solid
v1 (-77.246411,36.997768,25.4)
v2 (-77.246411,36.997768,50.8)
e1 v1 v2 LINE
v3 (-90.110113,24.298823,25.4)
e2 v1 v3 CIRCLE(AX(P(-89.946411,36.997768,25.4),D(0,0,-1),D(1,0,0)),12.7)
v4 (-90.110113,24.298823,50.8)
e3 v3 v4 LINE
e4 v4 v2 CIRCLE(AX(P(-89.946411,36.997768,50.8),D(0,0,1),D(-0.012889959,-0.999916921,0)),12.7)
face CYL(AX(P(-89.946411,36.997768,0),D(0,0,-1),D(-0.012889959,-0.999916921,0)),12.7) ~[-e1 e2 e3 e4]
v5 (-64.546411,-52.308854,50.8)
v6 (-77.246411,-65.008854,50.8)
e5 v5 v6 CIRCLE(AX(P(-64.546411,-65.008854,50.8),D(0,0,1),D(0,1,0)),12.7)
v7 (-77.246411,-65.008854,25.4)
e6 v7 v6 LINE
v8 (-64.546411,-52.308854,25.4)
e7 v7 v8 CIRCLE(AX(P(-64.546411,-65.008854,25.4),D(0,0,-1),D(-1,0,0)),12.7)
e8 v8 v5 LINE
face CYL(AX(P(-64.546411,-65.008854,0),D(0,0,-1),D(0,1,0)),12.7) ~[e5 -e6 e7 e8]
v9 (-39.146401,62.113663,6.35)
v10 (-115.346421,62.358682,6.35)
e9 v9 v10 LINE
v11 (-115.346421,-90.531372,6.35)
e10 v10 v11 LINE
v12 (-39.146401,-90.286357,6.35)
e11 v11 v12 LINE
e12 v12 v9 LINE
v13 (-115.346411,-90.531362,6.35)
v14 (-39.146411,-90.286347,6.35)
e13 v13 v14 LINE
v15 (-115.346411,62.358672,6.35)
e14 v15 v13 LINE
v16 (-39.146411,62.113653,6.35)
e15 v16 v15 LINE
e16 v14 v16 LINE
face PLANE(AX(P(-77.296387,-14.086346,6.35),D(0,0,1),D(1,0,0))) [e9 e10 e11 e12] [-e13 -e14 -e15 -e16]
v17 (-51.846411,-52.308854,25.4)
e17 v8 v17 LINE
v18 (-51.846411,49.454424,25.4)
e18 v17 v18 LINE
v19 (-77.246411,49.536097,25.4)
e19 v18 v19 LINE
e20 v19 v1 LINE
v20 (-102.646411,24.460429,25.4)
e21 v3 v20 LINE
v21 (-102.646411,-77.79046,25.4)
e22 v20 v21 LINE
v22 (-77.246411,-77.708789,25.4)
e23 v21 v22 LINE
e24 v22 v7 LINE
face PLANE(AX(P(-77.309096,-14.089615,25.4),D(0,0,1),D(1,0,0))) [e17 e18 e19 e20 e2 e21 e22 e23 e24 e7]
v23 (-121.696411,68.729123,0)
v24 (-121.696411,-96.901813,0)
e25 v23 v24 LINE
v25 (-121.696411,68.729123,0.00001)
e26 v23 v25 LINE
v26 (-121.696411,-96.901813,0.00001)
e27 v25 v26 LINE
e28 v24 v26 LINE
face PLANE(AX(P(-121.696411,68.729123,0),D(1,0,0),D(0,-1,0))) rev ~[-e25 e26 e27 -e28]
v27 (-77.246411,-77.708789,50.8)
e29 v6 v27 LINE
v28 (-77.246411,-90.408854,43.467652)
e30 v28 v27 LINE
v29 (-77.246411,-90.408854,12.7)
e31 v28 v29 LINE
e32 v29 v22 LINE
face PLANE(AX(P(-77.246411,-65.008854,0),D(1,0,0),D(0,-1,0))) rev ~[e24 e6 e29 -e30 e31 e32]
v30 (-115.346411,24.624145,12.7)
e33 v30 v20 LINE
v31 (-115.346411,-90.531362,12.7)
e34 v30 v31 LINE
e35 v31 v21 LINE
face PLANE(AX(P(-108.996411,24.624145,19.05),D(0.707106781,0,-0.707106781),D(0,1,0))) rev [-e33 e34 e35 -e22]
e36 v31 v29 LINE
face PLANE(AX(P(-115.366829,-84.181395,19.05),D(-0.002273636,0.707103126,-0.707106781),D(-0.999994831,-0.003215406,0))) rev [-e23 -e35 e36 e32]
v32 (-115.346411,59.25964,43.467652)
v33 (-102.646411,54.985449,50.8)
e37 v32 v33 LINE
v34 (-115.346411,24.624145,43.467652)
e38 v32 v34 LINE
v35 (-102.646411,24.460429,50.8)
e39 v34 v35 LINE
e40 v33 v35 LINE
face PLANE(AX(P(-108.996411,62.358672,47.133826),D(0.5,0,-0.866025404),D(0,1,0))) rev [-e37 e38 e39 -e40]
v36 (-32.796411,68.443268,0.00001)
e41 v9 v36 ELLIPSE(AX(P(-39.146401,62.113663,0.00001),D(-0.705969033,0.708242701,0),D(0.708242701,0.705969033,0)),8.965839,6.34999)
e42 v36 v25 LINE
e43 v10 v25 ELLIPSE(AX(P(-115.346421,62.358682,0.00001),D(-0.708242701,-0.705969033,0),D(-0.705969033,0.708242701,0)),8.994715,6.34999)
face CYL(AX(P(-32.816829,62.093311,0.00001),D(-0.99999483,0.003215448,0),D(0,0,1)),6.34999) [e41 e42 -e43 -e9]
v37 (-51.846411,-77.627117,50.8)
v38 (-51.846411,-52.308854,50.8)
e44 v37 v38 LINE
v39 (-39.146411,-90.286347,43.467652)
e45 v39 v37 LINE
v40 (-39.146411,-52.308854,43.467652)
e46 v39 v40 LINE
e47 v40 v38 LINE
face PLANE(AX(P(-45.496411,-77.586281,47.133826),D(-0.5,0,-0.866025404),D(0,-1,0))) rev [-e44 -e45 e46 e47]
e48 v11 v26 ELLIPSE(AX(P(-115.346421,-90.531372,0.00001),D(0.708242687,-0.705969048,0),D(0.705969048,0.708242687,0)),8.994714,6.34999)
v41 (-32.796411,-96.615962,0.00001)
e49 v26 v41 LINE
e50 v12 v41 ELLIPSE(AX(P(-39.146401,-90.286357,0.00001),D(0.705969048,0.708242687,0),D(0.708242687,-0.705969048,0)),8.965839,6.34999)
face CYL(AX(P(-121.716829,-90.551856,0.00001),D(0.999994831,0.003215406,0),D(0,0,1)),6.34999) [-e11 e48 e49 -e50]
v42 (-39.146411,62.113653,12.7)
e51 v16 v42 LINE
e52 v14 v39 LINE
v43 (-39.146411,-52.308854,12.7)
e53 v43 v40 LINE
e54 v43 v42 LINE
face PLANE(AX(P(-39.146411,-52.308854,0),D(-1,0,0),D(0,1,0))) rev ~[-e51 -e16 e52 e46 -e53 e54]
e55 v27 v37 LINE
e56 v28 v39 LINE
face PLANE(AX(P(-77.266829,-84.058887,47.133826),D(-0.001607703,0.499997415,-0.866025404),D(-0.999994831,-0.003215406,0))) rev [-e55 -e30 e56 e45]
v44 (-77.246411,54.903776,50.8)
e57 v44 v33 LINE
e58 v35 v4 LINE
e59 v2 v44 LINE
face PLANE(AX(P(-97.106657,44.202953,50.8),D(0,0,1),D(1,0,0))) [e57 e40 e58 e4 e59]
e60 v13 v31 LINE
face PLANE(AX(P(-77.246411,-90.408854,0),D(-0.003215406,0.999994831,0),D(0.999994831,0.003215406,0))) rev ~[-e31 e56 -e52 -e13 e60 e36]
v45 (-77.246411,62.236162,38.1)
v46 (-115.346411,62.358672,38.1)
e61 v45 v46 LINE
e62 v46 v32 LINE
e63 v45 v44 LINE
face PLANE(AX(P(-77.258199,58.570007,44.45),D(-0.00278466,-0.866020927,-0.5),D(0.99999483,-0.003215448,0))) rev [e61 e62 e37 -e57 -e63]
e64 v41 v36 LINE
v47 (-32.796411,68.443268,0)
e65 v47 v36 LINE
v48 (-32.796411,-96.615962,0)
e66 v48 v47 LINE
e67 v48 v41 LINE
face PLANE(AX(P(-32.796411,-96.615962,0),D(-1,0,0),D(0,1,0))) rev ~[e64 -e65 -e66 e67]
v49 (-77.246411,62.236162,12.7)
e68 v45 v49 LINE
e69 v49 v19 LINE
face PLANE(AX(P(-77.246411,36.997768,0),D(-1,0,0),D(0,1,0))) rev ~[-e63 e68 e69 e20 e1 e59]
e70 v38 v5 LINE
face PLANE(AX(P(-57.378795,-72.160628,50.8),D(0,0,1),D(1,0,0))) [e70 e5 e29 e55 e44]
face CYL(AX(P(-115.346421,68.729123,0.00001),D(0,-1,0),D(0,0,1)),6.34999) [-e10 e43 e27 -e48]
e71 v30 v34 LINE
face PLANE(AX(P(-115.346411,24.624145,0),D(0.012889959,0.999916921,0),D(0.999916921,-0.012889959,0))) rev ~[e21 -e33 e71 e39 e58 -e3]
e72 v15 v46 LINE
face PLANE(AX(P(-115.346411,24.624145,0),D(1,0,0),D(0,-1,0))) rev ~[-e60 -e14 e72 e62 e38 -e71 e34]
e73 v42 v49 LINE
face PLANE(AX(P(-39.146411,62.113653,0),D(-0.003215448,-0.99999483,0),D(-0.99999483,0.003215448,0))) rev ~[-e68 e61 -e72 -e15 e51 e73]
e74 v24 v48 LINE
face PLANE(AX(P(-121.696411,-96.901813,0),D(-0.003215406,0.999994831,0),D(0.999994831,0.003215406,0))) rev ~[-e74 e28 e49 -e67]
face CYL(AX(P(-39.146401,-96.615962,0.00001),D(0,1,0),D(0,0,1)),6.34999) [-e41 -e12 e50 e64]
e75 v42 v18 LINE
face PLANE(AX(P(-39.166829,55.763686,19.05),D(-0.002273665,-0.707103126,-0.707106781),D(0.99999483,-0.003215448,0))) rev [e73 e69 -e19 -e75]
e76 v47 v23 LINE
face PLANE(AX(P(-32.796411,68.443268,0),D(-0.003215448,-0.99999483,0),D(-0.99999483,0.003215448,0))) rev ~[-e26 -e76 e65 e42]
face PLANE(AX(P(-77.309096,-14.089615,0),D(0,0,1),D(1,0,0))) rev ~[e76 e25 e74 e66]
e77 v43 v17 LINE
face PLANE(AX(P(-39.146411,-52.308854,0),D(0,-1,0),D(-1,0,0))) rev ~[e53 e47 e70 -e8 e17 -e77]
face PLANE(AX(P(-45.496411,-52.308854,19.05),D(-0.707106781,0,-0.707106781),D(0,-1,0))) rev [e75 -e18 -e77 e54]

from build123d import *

# Parameters (mm, degrees)
F1_DEPTH    = 6.35
F2_DEPTH    = 25.4
F3_DEPTH    = 50.8
F4_R        = 6.34999
F5_SIZE     = 12.7
F6_C1_SIZE2 = 12.7
F6_C1_SIZE  = 7.3323484187
F6_C2_SIZE2 = 12.7
F6_C2_SIZE  = 7.3323484187
F6_C3_SIZE2 = 7.3323484187
F6_C3_SIZE  = 12.7
F6_C4_SIZE2 = 12.7
F6_C4_SIZE  = 7.3323484187


# Not quite as in the source:
# - a fillet or chamfer is up to 0.001 mm smaller than in the source, because OpenCascade refuses the exact size


with BuildPart() as f1:
    # F0 (on Top) → F1 (new body)
    with BuildSketch(Plane.XY):
        Polygon((-32.7964108223, 68.4432678408), (-121.6964108223, 68.7291226315), (-121.6964108223, -96.9018127685), (-32.7964108223, -96.6159616778), align=None)
        Polygon((-115.3464108223, 24.6241450903), (-115.3464108223, 62.3586716052), (-77.2464108223, 62.2361624092), (-39.1464108223, 62.1136532132), (-39.1464108223, -52.3088543971), (-39.1464108223, -90.2863467868), (-77.2464108223, -90.4088543971), (-115.3464108223, -90.5313620074), align=None, mode=Mode.SUBTRACT)
    extrude(amount=F1_DEPTH)

    # F0 (on Top) → F2 (join)
    with BuildSketch(Plane.XY):
        with BuildLine():
            Line((-90.1101133053, 24.2988232152), (-115.3464108223, 24.6241450903))
            Line((-115.3464108223, 24.6241450903), (-115.3464108223, -90.5313620074))
            Line((-115.3464108223, -90.5313620074), (-77.2464108223, -90.4088543971))
            Line((-77.2464108223, -90.4088543971), (-77.2464108223, -65.0088543971))
            ThreePointArc((-77.2464108223, -65.0088543971), (-73.5266669434, -56.028598276), (-64.5464108223, -52.3088543971))
            Line((-64.5464108223, -52.3088543971), (-39.1464108223, -52.3088543971))
            Line((-39.1464108223, -52.3088543971), (-39.1464108223, 62.1136532132))
            Line((-39.1464108223, 62.1136532132), (-77.2464108223, 62.2361624092))
            Line((-77.2464108223, 62.2361624092), (-77.2464108223, 36.9977681122))
            ThreePointArc((-77.2464108223, 36.9977681122), (-81.0242199909, 27.9598197407), (-90.1101133053, 24.2988232152))
        make_face()
    extrude(amount=F2_DEPTH)

    # F0 (on Top) → F3 (join)
    with BuildSketch(Plane.XY):
        with BuildLine():
            Line((-77.2464108223, -65.0088543971), (-77.2464108223, -90.4088543971))
            Line((-77.2464108223, -90.4088543971), (-39.1464108223, -90.2863467868))
            Line((-39.1464108223, -90.2863467868), (-39.1464108223, -52.3088543971))
            Line((-39.1464108223, -52.3088543971), (-64.5464108223, -52.3088543971))
            ThreePointArc((-64.5464108223, -52.3088543971), (-73.5266669434, -56.028598276), (-77.2464108223, -65.0088543971))
        make_face()
        with BuildLine():
            Line((-77.2464108223, 62.2361624092), (-115.3464108223, 62.3586716052))
            Line((-115.3464108223, 62.3586716052), (-115.3464108223, 24.6241450903))
            Line((-115.3464108223, 24.6241450903), (-90.1101133053, 24.2988232152))
            ThreePointArc((-90.1101133053, 24.2988232152), (-81.0242199909, 27.9598197407), (-77.2464108223, 36.9977681122))
            Line((-77.2464108223, 36.9977681122), (-77.2464108223, 62.2361624092))
        make_face()
    extrude(amount=F3_DEPTH)

    # F4 (radius 6.35 in the source; OpenCascade refuses exactly that, so slightly less here)
    f4_edges = [f1.edges().sort_by_distance(p)[0] for p in [
        (-77.246411, -96.758887, 6.35),
        (-32.796411, -14.086347, 6.35),
        (-77.246411, 68.586195, 6.35),
        (-121.696411, -14.086345, 6.35),
    ]]
    fillet(f4_edges, radius=F4_R)

    # F5
    f5_edges = [f1.edges().sort_by_distance(p)[0] for p in [
        (-96.296411, -90.470108, 25.4),
        (-39.146411, 4.902399, 25.4),
        (-115.346411, -32.953608, 25.4),
        (-58.196411, 62.174908, 25.4),
    ]]
    chamfer(f5_edges, length=F5_SIZE)

    # F6: chamfer of 12.7 x 7.3323484187 on 4 edges, made by hand

    # F6_c1
    f6_c1_edges = [f1.edges().sort_by_distance(p)[0] for p in [
        (-115.3464108223, 43.4914083477, 50.8),
    ]]
    f6_c1_side = f1.faces().sort_by_distance((-115.3464108223, 43.4914083477, 50.6533530316))[0]
    chamfer(f6_c1_edges, length=F6_C1_SIZE, length2=F6_C1_SIZE2, reference=f6_c1_side)

    # F6_c2
    f6_c2_edges = [f1.edges().sort_by_distance(p)[0] for p in [
        (-58.1964108223, -90.3476005919, 50.8),
    ]]
    f6_c2_side = f1.faces().sort_by_distance((-58.1964108223, -90.3476005919, 50.6533530316))[0]
    chamfer(f6_c2_edges, length=F6_C2_SIZE, length2=F6_C2_SIZE2, reference=f6_c2_side)

    # F6_c3
    f6_c3_edges = [f1.edges().sort_by_distance(p)[0] for p in [
        (-89.9464108223, 62.2769988079, 50.8),
    ]]
    f6_c3_side = f1.faces().sort_by_distance((-89.9464108223, 62.2769988079, 50.6533530316))[0]
    chamfer(f6_c3_edges, length=F6_C3_SIZE, length2=F6_C3_SIZE2, reference=f6_c3_side)

    # F6_c4
    f6_c4_edges = [f1.edges().sort_by_distance(p)[0] for p in [
        (-39.1464108223, -64.9475677659, 50.8),
    ]]
    f6_c4_side = f1.faces().sort_by_distance((-39.1464108223, -64.9475677659, 50.6533530316))[0]
    chamfer(f6_c4_edges, length=F6_C4_SIZE, length2=F6_C4_SIZE2, reference=f6_c4_side)


solid = f1.part
